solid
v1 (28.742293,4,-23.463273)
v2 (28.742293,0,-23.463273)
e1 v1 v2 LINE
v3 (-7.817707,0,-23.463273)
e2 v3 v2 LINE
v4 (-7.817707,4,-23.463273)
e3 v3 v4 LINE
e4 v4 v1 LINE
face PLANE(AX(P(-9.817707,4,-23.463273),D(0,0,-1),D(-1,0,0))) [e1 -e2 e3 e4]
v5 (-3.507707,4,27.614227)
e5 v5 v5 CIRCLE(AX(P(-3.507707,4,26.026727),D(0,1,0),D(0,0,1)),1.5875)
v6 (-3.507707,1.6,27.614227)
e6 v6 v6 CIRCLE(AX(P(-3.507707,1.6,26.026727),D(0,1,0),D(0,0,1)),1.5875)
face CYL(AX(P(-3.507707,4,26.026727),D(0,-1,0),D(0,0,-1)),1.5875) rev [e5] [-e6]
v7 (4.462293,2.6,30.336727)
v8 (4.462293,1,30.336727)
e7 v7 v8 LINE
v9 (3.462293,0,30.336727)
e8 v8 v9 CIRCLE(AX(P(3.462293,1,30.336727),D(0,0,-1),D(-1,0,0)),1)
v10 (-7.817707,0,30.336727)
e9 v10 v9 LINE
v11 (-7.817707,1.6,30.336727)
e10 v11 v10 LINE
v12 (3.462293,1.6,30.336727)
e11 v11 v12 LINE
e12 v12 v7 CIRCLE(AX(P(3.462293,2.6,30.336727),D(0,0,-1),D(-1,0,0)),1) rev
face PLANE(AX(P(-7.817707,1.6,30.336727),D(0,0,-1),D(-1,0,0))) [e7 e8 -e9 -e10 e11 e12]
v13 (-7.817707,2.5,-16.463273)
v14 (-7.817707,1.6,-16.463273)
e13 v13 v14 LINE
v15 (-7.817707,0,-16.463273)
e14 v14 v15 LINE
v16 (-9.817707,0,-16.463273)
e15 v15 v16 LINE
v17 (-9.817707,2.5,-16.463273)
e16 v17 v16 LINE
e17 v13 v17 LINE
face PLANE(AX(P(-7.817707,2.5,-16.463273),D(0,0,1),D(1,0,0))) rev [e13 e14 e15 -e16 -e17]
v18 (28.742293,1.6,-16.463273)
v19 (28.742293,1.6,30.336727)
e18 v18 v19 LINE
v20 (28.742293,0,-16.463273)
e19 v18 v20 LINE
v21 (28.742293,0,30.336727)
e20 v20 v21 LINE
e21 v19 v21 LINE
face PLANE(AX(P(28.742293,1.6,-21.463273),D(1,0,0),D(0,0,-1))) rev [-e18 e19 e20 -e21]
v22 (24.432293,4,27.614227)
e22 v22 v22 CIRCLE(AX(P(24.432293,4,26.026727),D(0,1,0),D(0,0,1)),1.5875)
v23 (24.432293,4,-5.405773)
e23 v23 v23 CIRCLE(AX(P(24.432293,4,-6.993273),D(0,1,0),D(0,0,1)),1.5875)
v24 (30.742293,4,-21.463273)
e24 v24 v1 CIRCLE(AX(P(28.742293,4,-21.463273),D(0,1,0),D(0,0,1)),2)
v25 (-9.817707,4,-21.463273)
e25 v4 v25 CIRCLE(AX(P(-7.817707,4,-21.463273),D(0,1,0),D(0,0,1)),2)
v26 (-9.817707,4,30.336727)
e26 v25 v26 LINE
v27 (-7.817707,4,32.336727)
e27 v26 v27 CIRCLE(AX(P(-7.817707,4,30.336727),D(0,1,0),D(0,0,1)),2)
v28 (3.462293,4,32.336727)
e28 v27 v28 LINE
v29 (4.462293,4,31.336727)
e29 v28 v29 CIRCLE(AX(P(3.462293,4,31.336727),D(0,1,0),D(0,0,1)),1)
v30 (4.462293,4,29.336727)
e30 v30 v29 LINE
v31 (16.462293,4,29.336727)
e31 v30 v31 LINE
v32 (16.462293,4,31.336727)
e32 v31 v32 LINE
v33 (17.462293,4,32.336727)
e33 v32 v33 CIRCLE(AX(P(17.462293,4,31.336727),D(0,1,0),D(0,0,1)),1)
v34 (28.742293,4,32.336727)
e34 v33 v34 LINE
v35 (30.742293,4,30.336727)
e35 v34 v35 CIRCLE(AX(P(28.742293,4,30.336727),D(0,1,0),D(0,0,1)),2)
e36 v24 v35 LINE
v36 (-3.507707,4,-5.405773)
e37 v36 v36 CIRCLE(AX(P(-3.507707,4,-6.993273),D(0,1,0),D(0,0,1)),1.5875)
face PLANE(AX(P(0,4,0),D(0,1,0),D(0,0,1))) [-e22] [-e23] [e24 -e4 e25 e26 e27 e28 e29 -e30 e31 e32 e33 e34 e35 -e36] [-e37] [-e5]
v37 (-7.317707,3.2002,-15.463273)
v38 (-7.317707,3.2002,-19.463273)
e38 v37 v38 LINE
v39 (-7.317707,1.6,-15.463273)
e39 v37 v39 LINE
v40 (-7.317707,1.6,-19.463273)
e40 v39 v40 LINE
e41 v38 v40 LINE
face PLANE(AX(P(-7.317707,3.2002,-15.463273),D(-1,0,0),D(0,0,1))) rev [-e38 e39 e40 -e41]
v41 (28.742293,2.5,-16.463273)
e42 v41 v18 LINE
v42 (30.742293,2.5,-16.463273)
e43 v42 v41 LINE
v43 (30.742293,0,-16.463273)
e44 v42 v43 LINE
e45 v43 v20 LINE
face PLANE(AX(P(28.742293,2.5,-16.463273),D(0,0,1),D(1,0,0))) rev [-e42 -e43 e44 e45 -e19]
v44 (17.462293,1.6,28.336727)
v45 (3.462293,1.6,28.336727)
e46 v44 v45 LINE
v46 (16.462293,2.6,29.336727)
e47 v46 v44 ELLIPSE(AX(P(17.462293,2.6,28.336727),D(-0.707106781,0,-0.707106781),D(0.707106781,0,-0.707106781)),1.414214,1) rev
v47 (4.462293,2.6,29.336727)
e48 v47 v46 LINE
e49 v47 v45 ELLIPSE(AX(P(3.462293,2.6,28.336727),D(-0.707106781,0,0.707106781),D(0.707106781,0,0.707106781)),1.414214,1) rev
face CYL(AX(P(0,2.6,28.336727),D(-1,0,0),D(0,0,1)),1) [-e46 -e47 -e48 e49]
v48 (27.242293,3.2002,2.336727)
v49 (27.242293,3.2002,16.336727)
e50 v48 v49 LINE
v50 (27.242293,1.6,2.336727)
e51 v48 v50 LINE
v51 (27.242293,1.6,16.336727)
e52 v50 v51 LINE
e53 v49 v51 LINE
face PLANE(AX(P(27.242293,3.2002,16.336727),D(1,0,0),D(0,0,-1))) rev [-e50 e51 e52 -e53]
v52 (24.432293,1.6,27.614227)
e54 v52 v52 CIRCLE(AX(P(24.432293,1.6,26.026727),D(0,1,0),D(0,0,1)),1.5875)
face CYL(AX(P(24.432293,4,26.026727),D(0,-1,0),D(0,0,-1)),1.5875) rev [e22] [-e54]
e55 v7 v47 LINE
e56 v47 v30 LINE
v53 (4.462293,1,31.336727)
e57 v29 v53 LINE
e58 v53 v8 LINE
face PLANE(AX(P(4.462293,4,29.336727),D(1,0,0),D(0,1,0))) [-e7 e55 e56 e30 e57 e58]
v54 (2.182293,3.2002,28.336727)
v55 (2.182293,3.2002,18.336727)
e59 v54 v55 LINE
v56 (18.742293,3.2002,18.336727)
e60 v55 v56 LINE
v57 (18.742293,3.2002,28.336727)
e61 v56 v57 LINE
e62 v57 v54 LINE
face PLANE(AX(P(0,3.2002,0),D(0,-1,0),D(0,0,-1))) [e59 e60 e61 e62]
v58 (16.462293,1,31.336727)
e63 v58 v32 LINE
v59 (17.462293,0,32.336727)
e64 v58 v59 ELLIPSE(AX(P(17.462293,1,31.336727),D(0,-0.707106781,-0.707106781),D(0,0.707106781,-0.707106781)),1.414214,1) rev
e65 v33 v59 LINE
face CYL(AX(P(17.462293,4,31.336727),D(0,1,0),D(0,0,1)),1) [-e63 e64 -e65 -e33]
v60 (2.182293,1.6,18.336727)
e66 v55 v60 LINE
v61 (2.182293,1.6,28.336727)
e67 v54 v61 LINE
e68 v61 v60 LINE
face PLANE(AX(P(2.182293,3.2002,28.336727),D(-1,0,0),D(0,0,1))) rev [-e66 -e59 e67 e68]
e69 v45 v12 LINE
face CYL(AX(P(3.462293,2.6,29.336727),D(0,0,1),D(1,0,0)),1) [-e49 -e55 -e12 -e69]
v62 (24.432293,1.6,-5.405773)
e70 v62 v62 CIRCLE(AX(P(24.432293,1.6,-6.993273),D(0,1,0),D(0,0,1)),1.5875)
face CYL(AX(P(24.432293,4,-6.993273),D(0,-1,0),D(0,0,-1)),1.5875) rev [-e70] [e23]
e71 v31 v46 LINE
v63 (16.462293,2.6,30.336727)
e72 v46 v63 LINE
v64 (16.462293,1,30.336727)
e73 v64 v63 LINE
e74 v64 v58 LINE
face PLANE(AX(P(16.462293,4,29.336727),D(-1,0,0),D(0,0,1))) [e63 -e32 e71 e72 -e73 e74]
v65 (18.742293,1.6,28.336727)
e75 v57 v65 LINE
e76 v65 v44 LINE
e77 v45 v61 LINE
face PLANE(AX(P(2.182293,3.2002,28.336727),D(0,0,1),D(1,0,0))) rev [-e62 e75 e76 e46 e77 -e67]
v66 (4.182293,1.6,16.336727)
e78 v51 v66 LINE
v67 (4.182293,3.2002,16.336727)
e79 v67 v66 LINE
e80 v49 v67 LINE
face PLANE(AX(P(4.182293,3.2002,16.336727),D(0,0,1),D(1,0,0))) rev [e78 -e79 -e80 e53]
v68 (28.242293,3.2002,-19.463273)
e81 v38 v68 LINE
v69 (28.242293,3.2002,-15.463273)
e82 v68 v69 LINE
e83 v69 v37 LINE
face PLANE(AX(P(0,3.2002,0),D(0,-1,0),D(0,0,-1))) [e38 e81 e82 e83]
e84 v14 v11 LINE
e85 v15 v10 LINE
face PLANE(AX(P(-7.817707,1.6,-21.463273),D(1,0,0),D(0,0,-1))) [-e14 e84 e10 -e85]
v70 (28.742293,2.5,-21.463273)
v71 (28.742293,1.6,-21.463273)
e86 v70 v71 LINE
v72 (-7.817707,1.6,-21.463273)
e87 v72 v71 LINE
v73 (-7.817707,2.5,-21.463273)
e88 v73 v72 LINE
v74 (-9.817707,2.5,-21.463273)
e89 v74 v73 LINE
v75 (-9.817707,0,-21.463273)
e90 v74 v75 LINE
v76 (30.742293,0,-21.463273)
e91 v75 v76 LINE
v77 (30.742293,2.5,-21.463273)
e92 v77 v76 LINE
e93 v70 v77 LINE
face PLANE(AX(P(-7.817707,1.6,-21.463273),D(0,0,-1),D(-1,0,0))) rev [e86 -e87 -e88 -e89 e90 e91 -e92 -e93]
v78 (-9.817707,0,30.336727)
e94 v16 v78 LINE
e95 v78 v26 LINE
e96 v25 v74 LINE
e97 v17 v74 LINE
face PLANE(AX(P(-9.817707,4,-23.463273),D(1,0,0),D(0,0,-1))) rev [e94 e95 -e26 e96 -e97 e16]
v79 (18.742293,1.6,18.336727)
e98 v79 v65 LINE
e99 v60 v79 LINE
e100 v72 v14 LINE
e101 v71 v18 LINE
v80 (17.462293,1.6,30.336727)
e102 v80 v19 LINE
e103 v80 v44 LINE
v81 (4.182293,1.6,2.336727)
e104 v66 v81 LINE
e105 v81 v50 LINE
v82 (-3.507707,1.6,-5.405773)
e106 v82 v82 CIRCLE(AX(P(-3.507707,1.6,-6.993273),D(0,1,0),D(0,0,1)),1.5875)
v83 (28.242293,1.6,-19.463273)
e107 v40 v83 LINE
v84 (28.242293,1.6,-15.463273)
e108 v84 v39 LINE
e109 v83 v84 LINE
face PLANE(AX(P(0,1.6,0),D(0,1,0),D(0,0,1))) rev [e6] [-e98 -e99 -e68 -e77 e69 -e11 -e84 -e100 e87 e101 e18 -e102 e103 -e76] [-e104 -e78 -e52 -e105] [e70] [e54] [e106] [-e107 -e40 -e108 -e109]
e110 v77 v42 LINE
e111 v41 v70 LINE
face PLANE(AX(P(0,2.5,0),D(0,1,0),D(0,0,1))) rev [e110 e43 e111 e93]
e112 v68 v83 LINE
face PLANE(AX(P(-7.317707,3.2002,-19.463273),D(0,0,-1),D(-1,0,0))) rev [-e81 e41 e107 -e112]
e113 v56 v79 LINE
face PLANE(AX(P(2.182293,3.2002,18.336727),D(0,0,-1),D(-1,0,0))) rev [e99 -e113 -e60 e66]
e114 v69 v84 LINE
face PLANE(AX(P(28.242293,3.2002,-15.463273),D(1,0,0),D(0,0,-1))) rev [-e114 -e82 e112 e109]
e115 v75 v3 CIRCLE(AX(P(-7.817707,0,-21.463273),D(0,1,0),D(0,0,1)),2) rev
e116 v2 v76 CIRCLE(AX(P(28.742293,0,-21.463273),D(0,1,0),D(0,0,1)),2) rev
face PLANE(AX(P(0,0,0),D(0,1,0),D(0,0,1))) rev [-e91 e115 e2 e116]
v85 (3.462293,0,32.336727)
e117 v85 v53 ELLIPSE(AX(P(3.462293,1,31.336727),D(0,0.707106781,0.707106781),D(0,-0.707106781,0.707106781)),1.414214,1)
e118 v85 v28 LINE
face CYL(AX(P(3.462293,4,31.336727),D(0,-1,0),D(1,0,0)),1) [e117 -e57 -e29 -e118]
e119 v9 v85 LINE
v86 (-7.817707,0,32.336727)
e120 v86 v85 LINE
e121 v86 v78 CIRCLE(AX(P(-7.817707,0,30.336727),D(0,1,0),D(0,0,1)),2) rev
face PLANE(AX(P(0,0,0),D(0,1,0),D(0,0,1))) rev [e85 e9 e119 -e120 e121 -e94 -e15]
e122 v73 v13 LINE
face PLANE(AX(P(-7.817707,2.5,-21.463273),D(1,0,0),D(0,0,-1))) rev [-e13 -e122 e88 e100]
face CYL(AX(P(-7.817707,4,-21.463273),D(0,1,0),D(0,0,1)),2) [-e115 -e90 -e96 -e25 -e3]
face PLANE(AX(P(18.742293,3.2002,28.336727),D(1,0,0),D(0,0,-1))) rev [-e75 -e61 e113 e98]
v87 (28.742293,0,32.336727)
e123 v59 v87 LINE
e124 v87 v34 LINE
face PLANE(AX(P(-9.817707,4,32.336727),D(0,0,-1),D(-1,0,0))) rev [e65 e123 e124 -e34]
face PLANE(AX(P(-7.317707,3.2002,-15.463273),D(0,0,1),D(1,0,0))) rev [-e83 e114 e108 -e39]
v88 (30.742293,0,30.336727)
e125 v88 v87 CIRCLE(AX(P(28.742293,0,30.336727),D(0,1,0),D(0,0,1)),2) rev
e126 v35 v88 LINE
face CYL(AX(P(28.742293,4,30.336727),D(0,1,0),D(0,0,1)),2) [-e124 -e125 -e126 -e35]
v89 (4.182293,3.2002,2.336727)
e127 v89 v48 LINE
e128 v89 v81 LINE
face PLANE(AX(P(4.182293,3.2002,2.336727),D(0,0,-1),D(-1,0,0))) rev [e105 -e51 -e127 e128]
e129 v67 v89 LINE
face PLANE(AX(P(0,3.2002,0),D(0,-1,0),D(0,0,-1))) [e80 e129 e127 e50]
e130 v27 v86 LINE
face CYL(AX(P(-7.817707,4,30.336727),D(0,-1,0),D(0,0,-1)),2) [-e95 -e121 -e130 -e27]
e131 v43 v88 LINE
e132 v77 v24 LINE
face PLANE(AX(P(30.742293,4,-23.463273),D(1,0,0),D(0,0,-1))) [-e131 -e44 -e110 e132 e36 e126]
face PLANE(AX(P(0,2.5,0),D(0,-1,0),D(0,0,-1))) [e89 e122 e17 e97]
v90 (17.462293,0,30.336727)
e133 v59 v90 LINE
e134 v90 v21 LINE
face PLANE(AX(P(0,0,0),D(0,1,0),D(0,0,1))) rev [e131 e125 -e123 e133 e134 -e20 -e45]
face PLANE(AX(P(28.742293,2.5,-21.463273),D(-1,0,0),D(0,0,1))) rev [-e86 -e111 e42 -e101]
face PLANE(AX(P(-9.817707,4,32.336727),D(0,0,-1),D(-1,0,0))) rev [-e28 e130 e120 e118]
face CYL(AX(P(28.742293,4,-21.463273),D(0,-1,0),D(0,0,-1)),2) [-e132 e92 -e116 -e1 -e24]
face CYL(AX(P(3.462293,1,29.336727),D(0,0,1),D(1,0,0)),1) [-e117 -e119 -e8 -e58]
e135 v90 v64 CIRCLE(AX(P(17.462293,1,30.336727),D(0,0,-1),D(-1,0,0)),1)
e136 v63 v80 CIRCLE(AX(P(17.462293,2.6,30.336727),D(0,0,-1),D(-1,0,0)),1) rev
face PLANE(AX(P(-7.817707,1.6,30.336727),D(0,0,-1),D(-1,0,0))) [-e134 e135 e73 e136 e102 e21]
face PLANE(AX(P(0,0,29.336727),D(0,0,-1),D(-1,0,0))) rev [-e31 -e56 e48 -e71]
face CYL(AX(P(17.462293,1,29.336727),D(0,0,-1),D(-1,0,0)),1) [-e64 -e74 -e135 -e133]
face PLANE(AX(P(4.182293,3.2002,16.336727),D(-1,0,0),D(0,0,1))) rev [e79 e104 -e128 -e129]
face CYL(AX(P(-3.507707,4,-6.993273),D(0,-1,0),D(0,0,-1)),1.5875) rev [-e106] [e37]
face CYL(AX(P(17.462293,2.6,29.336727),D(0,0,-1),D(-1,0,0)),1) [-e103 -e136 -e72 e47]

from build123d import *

# Parameters (mm, degrees)
SKETCH1_R           = 1.5875000000000004
SKETCH1_R_2         = 1.5874999999999988
SKETCH1_R_3         = 1.5874999999999977
SKETCH1_R_4         = 1.5874999999999986
BOSS_EXTRUDE2_DEPTH = 4
CUT_EXTRUDE1_DEPTH  = 1.6
CUT_EXTRUDE2_DEPTH  = 1.6002
SKETCH4_W           = 2
SKETCH4_H           = 5
SKETCH4_W_2         = 2.000000000000001
CUT_EXTRUDE3_DEPTH  = 2.5
CUT_EXTRUDE4_DEPTH  = 3
FILLET1_R           = 2
FILLET2_R           = 1


with BuildPart() as part:
    # Sketch1 → Boss-Extrude2 (new body)
    with BuildSketch(Plane(origin=(0, 0, 0), x_dir=(1, 0, 0), z_dir=(0, 1, 0))):
        Polygon((-9.817707317102446, 23.463272745610922), (30.74229268289756, 23.463272745610926), (30.742292682897567, -32.336727254389075), (-9.81770731710244, -32.336727254389075), align=None)
        with Locations(Location((-3.5077073171024433, 6.993272745610932, 0), (0, 0, 270))):
            Circle(SKETCH1_R, mode=Mode.SUBTRACT)
        with Locations(Location((24.432292682897558, 6.993272745610931, 0), (0, 0, 270))):
            Circle(SKETCH1_R_2, mode=Mode.SUBTRACT)
        with Locations(Location((-3.5077073171024393, -26.026727254389073, 0), (0, 0, 270))):
            Circle(SKETCH1_R_3, mode=Mode.SUBTRACT)
        with Locations(Location((24.432292682897558, -26.026727254389073, 0), (0, 0, 270))):
            Circle(SKETCH1_R_4, mode=Mode.SUBTRACT)
    extrude(amount=BOSS_EXTRUDE2_DEPTH)

    # Sketch1<4> → Cut-Extrude1 (cut)
    with BuildSketch(Plane(origin=(0, 0, 0), x_dir=(1, 0, 0), z_dir=(0, 1, 0))):
        Polygon((-7.817707317102445, 21.463272745610922), (28.742292682897556, 21.463272745610926), (28.742292682897563, -30.336727254389075), (-7.817707317102438, -30.336727254389075), align=None)
    extrude(amount=CUT_EXTRUDE1_DEPTH, mode=Mode.SUBTRACT)

    # Sketch3 → Cut-Extrude2 (cut)
    with BuildSketch(Plane.XZ.offset(-1.6)):
        Polygon((-7.317707317102444, -15.463272745610924), (28.242292682897553, -15.463272745610924), (28.242292682897553, -19.463272745610922), (-7.317707317102443, -19.463272745610922), align=None)
        Polygon((2.182292682897542, 28.33672725438907), (18.74229268289756, 28.33672725438907), (18.74229268289756, 18.336727254389068), (2.1822926828975433, 18.336727254389068), align=None)
        Polygon((4.182292682897542, 16.336727254389075), (27.242292682897556, 16.336727254389075), (27.242292682897556, 2.3367272543890727), (4.182292682897544, 2.3367272543890727), align=None)
    extrude(amount=-CUT_EXTRUDE2_DEPTH, mode=Mode.SUBTRACT)

    # Sketch4 → Cut-Extrude3 (cut)
    with BuildSketch(Plane.XZ):
        with Locations((29.74229268289756, -18.96327274561092)):
            Rectangle(SKETCH4_W, SKETCH4_H)
        with Locations((-8.817707317102446, -18.96327274561092)):
            Rectangle(SKETCH4_W_2, SKETCH4_H)
    extrude(amount=-CUT_EXTRUDE3_DEPTH, mode=Mode.SUBTRACT)

    # Sketch5 → Cut-Extrude4 (cut)
    with BuildSketch(Plane(origin=(0, 0, 32.336727254389075), x_dir=(-1, 0, 0), z_dir=(0, 0, -1))):
        Polygon((-16.462292682897562, 4.000000000000003), (-4.462292682897565, 4.000000000000007), (-4.462292682897558, -5.590997478767573), (-16.462292682897562, -5.590997478767577), align=None)
    extrude(amount=CUT_EXTRUDE4_DEPTH, mode=Mode.SUBTRACT)

    # Fillet1
    fillet1_edges = [part.edges().sort_by_distance(p)[0] for p in [
        (-9.817707317102446, 2, -23.463272745610922),
        (30.74229268289756, 2, -23.463272745610926),
        (30.742292682897567, 2, 32.336727254389075),
        (-9.81770731710244, 2, 32.336727254389075),
    ]]
    fillet(fillet1_edges, radius=FILLET1_R)

    # Fillet2
    fillet2_edges = [part.edges().sort_by_distance(p)[0] for p in [
        (10.46229268289756, 1.6, 29.336727254389075),
        (4.462292682897564, 1.6, 29.836727254389075),
        (16.462292682897562, 1.6000000000000003, 29.836727254389075),
        (16.462292682897562, 2.000000000000001, 32.336727254389075),
        (4.462292682897563, 2.0000000000000036, 32.336727254389075),
        (16.462292682897562, 0, 31.336727254389075),
        (4.462292682897562, 0, 31.336727254389075),
    ]]
    fillet(fillet2_edges, radius=FILLET2_R - 0.0001)  # a hair under: the kernel refuses the full size


solid = part.part
